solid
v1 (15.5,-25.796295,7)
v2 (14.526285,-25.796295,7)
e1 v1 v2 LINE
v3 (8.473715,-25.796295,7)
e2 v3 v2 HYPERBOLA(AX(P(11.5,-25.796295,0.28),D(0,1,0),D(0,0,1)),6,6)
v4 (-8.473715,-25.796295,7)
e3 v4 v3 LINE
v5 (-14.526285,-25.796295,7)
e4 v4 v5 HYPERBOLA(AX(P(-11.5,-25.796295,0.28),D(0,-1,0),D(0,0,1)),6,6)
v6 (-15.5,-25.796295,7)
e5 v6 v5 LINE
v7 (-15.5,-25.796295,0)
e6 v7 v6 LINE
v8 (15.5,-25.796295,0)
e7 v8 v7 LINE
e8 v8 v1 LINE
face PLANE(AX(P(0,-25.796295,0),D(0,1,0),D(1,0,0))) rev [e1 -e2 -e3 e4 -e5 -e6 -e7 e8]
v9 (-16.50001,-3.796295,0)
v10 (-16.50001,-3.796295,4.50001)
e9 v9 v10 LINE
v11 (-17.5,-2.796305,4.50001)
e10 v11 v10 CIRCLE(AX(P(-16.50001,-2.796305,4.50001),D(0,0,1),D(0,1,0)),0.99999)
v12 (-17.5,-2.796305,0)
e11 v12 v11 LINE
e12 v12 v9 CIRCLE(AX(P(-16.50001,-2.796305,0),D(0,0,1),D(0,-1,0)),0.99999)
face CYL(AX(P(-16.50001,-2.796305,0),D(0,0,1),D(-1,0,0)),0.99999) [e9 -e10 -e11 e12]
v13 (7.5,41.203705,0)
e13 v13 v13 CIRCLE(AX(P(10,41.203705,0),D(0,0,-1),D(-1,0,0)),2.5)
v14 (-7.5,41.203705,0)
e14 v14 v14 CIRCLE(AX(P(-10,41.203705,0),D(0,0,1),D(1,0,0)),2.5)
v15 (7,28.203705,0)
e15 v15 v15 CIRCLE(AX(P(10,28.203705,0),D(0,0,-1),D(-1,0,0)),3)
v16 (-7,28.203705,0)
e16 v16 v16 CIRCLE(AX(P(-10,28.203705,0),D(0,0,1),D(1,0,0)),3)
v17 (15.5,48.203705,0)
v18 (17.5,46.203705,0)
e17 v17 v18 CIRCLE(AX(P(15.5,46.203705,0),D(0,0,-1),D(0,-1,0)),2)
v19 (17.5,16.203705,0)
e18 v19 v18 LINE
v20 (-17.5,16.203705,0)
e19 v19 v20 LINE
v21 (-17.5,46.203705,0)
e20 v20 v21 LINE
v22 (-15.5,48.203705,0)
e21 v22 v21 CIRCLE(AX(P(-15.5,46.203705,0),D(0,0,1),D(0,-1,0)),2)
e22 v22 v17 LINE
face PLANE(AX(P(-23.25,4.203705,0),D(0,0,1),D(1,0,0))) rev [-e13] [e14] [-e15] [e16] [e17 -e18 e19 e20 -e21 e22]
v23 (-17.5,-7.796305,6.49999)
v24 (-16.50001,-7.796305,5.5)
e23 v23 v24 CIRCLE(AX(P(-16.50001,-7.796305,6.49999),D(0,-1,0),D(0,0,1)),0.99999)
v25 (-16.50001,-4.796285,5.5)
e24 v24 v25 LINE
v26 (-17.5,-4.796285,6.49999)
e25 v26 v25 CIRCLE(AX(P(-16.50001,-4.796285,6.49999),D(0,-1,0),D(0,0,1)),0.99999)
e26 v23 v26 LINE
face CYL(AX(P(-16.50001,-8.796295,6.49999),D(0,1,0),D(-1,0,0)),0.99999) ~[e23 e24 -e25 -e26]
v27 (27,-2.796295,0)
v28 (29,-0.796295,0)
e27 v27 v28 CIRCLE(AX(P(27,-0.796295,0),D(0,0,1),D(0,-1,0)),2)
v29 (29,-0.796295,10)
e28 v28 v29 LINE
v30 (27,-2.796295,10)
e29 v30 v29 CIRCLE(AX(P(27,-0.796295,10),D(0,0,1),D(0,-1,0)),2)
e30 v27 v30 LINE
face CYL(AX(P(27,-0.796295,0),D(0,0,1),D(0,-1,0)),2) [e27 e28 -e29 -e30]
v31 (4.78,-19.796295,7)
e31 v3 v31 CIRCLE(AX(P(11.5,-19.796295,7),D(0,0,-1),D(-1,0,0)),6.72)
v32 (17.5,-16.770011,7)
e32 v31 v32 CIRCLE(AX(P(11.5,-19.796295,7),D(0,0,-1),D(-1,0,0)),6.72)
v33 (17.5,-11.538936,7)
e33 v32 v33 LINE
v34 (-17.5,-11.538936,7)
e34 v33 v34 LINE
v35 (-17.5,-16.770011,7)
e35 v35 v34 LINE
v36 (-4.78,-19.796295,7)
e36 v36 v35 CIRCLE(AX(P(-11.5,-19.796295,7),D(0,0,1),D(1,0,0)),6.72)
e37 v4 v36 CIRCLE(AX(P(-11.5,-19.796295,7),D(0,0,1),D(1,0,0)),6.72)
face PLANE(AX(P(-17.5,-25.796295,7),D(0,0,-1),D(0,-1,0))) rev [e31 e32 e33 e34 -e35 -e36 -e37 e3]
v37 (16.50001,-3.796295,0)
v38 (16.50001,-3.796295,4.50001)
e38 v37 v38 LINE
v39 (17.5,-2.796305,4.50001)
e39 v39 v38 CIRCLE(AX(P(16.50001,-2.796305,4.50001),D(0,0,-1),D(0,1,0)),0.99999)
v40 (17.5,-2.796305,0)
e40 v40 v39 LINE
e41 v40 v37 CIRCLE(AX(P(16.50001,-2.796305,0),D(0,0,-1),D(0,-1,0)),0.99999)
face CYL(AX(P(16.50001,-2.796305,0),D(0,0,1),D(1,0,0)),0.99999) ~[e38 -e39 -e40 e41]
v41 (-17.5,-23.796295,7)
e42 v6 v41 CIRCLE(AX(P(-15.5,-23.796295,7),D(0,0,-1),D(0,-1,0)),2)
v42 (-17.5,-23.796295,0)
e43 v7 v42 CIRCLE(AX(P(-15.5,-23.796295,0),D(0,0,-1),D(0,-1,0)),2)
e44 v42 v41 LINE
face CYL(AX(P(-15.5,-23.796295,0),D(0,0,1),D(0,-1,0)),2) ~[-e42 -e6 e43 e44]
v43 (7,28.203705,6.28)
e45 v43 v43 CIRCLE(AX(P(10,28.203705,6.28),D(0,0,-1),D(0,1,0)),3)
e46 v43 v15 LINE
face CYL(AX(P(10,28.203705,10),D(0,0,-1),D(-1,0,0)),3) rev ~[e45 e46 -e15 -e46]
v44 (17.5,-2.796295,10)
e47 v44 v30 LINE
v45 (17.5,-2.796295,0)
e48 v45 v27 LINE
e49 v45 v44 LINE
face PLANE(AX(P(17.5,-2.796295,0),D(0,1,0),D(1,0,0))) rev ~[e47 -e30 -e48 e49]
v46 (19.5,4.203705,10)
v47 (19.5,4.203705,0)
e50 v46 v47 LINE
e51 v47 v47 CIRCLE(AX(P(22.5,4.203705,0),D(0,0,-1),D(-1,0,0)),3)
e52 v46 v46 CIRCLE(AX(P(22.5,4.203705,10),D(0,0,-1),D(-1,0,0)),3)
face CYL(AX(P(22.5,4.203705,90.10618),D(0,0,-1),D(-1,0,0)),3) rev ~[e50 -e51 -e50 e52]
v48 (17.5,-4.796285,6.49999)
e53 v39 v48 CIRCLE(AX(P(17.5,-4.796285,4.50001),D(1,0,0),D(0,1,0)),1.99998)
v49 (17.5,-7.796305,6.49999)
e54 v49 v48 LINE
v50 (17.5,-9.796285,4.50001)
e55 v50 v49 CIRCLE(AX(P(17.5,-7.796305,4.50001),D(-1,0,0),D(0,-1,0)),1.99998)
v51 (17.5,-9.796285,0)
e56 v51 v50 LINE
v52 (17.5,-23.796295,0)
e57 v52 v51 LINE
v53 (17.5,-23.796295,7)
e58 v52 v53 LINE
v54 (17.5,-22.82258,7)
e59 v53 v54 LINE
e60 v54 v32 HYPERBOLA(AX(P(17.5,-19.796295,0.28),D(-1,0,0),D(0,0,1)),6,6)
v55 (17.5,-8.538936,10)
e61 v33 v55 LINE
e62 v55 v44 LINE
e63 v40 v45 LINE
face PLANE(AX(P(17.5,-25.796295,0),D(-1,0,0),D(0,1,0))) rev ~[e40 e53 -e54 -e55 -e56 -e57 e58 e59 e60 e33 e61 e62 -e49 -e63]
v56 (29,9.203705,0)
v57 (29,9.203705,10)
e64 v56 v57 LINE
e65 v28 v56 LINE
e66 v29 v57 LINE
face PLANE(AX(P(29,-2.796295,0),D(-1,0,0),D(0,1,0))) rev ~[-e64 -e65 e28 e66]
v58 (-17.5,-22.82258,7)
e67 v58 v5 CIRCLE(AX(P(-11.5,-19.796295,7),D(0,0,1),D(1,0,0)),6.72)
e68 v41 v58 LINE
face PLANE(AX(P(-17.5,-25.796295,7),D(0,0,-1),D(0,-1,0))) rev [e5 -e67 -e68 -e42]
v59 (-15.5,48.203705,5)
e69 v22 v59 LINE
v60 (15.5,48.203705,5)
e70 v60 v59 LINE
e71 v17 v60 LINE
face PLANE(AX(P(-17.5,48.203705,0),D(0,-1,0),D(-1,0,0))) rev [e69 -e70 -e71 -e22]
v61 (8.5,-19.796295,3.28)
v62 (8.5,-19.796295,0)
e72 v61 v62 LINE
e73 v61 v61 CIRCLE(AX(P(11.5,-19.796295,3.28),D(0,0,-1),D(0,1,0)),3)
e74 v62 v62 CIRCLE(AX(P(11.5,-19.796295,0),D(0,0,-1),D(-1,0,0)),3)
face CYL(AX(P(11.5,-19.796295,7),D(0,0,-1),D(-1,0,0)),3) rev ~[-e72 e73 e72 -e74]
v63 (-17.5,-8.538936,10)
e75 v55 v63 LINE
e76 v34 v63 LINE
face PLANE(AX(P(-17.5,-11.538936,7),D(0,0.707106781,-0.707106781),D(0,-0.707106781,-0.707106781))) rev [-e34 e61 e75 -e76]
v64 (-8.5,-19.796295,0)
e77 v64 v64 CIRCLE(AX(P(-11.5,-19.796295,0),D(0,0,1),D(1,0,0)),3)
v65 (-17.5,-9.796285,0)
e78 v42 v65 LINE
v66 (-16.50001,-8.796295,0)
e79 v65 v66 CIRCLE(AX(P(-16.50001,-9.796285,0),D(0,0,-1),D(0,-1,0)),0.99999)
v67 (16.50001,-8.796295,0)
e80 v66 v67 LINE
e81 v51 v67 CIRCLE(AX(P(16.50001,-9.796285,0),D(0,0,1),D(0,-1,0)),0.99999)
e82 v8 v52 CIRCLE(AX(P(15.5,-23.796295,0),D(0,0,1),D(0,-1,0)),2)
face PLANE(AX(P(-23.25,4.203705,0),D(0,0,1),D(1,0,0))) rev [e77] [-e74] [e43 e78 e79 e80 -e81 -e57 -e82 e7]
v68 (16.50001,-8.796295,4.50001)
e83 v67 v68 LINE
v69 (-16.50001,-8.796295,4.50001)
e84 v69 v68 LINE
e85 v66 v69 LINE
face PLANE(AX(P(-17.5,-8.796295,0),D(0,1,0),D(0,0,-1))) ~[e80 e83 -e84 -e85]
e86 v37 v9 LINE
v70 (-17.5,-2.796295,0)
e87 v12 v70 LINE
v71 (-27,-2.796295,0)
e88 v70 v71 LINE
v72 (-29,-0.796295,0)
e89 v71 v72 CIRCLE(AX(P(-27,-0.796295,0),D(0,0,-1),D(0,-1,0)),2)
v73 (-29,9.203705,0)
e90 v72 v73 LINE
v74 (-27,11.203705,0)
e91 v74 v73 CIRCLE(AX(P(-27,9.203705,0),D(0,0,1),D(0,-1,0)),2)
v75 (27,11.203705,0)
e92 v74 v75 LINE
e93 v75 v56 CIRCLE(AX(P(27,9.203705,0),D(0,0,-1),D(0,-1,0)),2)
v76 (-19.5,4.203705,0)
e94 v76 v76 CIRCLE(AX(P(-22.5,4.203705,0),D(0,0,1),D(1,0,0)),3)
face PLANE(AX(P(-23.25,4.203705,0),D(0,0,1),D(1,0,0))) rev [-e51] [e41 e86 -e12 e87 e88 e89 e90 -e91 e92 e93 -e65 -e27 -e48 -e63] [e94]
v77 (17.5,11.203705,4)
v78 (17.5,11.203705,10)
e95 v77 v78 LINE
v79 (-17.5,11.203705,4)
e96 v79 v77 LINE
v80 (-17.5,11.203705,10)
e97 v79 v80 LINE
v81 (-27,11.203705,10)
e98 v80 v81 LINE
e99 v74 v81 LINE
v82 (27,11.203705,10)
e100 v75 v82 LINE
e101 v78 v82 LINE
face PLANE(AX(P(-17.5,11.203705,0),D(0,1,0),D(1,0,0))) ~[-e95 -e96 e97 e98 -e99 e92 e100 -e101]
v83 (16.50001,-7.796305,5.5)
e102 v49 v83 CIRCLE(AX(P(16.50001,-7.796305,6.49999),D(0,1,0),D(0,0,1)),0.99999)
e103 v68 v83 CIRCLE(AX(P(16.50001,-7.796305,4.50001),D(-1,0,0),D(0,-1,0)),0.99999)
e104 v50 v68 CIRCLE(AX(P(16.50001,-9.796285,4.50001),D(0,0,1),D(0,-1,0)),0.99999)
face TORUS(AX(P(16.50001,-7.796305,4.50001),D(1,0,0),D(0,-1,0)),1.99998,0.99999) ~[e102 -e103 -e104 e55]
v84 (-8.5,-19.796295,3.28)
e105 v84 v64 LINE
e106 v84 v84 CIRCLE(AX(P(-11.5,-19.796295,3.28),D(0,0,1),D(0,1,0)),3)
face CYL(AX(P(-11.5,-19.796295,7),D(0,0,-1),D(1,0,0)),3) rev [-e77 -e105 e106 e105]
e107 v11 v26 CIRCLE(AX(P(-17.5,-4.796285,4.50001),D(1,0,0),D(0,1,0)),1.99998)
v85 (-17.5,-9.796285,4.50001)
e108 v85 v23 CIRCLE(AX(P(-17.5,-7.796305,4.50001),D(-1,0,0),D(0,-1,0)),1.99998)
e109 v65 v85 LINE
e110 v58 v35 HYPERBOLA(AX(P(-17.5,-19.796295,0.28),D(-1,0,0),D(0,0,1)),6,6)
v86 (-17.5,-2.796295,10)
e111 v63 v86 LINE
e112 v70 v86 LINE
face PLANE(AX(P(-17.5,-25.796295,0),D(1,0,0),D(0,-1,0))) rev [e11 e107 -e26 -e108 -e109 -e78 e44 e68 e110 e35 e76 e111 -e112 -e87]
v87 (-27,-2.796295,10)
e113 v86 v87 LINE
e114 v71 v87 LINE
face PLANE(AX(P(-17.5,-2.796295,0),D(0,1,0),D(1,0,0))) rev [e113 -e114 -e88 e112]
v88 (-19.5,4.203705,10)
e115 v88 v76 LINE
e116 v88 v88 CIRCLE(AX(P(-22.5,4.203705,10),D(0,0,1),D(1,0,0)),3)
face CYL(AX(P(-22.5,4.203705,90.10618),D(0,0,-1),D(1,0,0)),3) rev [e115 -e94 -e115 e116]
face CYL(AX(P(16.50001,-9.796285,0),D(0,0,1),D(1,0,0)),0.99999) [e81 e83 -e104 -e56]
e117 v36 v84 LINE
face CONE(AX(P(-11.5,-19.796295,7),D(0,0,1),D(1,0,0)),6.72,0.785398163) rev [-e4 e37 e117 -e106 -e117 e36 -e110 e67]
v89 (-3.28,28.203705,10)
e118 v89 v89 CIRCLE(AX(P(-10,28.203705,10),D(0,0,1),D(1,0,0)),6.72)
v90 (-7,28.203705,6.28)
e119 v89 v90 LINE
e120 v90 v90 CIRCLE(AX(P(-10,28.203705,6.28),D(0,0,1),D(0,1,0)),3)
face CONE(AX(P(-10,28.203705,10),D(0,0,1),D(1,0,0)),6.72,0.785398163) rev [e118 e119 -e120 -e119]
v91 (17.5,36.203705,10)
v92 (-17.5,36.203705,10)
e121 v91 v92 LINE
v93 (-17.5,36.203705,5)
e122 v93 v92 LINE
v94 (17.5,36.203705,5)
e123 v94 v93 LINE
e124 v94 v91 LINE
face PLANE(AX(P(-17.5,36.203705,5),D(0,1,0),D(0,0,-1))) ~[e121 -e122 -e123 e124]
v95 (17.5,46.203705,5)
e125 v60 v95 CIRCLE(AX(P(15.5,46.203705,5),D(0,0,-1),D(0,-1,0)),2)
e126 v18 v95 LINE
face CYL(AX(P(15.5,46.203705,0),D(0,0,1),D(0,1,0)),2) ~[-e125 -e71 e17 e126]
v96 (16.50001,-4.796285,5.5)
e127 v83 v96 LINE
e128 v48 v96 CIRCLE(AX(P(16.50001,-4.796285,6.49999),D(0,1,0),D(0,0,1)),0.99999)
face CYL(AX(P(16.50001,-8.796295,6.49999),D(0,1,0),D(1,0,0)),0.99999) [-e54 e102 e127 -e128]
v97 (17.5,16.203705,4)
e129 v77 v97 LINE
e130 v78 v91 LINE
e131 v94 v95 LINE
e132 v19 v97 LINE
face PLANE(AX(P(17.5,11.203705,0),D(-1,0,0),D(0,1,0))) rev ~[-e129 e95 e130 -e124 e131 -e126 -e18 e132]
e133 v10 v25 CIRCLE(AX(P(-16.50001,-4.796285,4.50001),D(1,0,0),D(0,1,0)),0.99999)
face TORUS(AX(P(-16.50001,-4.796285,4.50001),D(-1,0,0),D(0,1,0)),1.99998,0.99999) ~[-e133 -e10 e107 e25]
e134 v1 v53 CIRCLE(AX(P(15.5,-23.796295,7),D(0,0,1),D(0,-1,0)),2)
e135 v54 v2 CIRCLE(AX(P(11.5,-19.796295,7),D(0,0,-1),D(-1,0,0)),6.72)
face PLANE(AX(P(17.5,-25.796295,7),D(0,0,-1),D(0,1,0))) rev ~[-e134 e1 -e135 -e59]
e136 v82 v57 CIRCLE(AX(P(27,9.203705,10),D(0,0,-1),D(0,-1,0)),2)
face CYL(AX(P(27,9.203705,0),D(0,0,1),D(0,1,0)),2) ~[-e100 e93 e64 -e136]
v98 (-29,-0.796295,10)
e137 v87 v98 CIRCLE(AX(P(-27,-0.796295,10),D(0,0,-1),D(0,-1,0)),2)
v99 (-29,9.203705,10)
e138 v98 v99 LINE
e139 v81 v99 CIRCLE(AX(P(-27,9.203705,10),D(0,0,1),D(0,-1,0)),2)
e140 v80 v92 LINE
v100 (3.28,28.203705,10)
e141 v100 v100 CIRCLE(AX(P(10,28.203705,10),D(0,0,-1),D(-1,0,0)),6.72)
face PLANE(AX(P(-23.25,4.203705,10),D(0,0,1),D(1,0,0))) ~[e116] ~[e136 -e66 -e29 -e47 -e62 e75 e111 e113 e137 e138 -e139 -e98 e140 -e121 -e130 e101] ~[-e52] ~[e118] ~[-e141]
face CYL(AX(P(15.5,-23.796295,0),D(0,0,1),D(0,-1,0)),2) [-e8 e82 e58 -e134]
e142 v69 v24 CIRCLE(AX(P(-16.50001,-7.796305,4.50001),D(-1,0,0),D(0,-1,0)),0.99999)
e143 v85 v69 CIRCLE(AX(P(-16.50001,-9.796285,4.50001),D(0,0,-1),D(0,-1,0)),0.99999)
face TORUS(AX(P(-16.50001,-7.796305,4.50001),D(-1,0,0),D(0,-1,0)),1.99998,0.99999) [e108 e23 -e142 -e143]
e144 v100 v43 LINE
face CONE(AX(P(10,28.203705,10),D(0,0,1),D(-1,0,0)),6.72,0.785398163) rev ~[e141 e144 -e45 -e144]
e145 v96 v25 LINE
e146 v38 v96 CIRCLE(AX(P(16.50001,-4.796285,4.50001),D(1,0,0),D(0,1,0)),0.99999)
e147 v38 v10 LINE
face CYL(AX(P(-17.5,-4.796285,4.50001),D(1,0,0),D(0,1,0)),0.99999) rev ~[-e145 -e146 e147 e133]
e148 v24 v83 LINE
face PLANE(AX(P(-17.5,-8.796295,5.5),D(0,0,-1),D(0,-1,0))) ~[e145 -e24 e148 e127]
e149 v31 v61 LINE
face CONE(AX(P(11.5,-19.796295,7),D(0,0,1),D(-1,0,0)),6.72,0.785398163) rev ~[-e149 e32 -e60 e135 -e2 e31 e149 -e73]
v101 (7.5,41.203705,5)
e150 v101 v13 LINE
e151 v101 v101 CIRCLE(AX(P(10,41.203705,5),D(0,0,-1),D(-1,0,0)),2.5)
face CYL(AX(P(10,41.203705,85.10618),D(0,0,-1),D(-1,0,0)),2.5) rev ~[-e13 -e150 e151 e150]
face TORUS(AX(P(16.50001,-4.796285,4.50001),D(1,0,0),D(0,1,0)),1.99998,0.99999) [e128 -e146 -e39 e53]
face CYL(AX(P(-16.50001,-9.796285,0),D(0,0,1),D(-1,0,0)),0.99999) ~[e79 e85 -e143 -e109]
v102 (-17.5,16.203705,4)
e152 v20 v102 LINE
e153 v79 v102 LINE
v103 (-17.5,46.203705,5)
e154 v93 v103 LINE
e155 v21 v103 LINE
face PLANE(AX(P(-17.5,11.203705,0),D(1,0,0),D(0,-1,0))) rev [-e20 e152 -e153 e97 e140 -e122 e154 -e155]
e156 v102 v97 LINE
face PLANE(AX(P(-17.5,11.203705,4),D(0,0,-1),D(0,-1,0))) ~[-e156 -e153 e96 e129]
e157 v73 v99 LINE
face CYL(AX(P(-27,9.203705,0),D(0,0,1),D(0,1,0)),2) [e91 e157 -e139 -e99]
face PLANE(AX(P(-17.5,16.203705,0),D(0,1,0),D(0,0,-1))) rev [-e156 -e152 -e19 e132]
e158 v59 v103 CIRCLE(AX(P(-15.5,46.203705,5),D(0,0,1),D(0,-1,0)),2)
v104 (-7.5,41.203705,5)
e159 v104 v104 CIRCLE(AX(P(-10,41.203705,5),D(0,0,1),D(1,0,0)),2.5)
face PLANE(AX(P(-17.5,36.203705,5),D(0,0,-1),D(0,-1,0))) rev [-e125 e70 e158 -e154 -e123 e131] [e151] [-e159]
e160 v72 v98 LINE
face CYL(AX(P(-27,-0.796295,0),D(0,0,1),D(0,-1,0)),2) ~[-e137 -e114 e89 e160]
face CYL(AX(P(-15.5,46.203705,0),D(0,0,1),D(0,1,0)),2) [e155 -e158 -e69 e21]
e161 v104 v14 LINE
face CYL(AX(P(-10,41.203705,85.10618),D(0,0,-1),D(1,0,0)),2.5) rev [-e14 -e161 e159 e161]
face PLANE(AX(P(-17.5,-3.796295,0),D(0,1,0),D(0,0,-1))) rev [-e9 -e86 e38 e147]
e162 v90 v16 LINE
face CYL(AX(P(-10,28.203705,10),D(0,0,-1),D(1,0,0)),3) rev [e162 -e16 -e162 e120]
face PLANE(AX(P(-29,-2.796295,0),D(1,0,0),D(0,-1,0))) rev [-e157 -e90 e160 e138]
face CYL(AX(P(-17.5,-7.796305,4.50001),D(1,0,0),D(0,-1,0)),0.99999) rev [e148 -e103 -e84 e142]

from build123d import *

# Parameters (mm, degrees)
F0_W            = 11.5
F0_H            = 14
F1_DEPTH        = 10
F2_W            = 5
F2_H            = 5.5
F2_H_2          = 4
F2_W_2          = 12
F2_H_3          = 5
F3_DEPTH        = 17.501
F7_D            = 5
F8_D            = 6
F9_D            = 6
F9_CSINK_D      = 13.44
F9_CSINK_ANGLE  = 90
F11_D           = 6
F11_CSINK_D     = 13.44
F11_CSINK_ANGLE = 90
F12_R           = 2
F13_R           = 0.99999


# Not quite as in the source:
# - a fillet or chamfer is up to 0.001 mm smaller than in the source, because OpenCascade refuses the exact size


with BuildPart() as f1:
    # F0 (on Top) → F1 (new body)
    with BuildSketch(Plane.XY):
        with Locations((23.25, 4.2037045646)):
            Rectangle(F0_W, F0_H)
        Polygon((17.5, 48.2037045646), (0, 48.2037045646), (0, -25.7962954354), (17.5, -25.7962954354), (17.5, -2.7962954354), (17.5, 11.2037045646), align=None)
    extrude(amount=F1_DEPTH)

    # F2 (on face) → F3 (cut, through all)
    with BuildSketch(Plane.YZ.offset(17.5)):
        Polygon((-25.7962954354, 10), (-25.7962954354, 7), (-11.5389361225, 7), (-8.5389361225, 10), align=None)
        with Locations((-6.2962954354, 2.75)):
            Rectangle(F2_W, F2_H)
        with Locations((13.7037045646, 2)):
            Rectangle(F2_W, F2_H_2)
        with Locations((42.2037045646, 7.5)):
            Rectangle(F2_W_2, F2_H_3)
    extrude(amount=-F3_DEPTH, mode=Mode.SUBTRACT)

    # F7 (through all)
    with Locations(Plane.XY.offset(5)):
        with Locations((10, 41.2037045646)):
            Hole(F7_D / 2)

    # F8 (through all)
    with Locations(Plane.XY.offset(10)):
        with Locations((22.5, 4.2037045646)):
            Hole(F8_D / 2)

    # F9 (through all)
    with Locations(Plane.XY.offset(7)):
        with Locations((11.5, -19.7962954354)):
            CounterSinkHole(F9_D / 2, F9_CSINK_D / 2, counter_sink_angle=F9_CSINK_ANGLE)

    # F11 (through all)
    with Locations(Plane.XY.offset(10)):
        with Locations((10, 28.2037045646)):
            CounterSinkHole(F11_D / 2, F11_CSINK_D / 2, counter_sink_angle=F11_CSINK_ANGLE)

    # F12
    f12_edges = [f1.edges().sort_by_distance(p)[0] for p in [
        (29, -2.796295, 5),
        (29, 11.203705, 5),
        (17.5, 48.203705, 2.5),
        (17.5, -25.796295, 3.5),
    ]]
    fillet(f12_edges, radius=F12_R)

    # F13 (radius 1 in the source; OpenCascade refuses exactly that, so slightly less here)
    f13_edges = [f1.edges().sort_by_distance(p)[0] for p in [
        (17.5, -6.296295, 5.5),
        (8.75, -3.796295, 5.5),
        (8.75, -8.796295, 5.5),
        (17.5, -8.796295, 2.75),
        (17.5, -3.796295, 2.75),
    ]]
    fillet(f13_edges, radius=F13_R)

    # F14: F1 across face


with BuildPart() as f1_1:
    add(f1.part)
    add(f1.part.mirror(Plane(origin=(0, 11.0999568472, 4.6658308471), x_dir=(0, -1, 0), z_dir=(-1, 0, 0))))


solid = f1_1.part
